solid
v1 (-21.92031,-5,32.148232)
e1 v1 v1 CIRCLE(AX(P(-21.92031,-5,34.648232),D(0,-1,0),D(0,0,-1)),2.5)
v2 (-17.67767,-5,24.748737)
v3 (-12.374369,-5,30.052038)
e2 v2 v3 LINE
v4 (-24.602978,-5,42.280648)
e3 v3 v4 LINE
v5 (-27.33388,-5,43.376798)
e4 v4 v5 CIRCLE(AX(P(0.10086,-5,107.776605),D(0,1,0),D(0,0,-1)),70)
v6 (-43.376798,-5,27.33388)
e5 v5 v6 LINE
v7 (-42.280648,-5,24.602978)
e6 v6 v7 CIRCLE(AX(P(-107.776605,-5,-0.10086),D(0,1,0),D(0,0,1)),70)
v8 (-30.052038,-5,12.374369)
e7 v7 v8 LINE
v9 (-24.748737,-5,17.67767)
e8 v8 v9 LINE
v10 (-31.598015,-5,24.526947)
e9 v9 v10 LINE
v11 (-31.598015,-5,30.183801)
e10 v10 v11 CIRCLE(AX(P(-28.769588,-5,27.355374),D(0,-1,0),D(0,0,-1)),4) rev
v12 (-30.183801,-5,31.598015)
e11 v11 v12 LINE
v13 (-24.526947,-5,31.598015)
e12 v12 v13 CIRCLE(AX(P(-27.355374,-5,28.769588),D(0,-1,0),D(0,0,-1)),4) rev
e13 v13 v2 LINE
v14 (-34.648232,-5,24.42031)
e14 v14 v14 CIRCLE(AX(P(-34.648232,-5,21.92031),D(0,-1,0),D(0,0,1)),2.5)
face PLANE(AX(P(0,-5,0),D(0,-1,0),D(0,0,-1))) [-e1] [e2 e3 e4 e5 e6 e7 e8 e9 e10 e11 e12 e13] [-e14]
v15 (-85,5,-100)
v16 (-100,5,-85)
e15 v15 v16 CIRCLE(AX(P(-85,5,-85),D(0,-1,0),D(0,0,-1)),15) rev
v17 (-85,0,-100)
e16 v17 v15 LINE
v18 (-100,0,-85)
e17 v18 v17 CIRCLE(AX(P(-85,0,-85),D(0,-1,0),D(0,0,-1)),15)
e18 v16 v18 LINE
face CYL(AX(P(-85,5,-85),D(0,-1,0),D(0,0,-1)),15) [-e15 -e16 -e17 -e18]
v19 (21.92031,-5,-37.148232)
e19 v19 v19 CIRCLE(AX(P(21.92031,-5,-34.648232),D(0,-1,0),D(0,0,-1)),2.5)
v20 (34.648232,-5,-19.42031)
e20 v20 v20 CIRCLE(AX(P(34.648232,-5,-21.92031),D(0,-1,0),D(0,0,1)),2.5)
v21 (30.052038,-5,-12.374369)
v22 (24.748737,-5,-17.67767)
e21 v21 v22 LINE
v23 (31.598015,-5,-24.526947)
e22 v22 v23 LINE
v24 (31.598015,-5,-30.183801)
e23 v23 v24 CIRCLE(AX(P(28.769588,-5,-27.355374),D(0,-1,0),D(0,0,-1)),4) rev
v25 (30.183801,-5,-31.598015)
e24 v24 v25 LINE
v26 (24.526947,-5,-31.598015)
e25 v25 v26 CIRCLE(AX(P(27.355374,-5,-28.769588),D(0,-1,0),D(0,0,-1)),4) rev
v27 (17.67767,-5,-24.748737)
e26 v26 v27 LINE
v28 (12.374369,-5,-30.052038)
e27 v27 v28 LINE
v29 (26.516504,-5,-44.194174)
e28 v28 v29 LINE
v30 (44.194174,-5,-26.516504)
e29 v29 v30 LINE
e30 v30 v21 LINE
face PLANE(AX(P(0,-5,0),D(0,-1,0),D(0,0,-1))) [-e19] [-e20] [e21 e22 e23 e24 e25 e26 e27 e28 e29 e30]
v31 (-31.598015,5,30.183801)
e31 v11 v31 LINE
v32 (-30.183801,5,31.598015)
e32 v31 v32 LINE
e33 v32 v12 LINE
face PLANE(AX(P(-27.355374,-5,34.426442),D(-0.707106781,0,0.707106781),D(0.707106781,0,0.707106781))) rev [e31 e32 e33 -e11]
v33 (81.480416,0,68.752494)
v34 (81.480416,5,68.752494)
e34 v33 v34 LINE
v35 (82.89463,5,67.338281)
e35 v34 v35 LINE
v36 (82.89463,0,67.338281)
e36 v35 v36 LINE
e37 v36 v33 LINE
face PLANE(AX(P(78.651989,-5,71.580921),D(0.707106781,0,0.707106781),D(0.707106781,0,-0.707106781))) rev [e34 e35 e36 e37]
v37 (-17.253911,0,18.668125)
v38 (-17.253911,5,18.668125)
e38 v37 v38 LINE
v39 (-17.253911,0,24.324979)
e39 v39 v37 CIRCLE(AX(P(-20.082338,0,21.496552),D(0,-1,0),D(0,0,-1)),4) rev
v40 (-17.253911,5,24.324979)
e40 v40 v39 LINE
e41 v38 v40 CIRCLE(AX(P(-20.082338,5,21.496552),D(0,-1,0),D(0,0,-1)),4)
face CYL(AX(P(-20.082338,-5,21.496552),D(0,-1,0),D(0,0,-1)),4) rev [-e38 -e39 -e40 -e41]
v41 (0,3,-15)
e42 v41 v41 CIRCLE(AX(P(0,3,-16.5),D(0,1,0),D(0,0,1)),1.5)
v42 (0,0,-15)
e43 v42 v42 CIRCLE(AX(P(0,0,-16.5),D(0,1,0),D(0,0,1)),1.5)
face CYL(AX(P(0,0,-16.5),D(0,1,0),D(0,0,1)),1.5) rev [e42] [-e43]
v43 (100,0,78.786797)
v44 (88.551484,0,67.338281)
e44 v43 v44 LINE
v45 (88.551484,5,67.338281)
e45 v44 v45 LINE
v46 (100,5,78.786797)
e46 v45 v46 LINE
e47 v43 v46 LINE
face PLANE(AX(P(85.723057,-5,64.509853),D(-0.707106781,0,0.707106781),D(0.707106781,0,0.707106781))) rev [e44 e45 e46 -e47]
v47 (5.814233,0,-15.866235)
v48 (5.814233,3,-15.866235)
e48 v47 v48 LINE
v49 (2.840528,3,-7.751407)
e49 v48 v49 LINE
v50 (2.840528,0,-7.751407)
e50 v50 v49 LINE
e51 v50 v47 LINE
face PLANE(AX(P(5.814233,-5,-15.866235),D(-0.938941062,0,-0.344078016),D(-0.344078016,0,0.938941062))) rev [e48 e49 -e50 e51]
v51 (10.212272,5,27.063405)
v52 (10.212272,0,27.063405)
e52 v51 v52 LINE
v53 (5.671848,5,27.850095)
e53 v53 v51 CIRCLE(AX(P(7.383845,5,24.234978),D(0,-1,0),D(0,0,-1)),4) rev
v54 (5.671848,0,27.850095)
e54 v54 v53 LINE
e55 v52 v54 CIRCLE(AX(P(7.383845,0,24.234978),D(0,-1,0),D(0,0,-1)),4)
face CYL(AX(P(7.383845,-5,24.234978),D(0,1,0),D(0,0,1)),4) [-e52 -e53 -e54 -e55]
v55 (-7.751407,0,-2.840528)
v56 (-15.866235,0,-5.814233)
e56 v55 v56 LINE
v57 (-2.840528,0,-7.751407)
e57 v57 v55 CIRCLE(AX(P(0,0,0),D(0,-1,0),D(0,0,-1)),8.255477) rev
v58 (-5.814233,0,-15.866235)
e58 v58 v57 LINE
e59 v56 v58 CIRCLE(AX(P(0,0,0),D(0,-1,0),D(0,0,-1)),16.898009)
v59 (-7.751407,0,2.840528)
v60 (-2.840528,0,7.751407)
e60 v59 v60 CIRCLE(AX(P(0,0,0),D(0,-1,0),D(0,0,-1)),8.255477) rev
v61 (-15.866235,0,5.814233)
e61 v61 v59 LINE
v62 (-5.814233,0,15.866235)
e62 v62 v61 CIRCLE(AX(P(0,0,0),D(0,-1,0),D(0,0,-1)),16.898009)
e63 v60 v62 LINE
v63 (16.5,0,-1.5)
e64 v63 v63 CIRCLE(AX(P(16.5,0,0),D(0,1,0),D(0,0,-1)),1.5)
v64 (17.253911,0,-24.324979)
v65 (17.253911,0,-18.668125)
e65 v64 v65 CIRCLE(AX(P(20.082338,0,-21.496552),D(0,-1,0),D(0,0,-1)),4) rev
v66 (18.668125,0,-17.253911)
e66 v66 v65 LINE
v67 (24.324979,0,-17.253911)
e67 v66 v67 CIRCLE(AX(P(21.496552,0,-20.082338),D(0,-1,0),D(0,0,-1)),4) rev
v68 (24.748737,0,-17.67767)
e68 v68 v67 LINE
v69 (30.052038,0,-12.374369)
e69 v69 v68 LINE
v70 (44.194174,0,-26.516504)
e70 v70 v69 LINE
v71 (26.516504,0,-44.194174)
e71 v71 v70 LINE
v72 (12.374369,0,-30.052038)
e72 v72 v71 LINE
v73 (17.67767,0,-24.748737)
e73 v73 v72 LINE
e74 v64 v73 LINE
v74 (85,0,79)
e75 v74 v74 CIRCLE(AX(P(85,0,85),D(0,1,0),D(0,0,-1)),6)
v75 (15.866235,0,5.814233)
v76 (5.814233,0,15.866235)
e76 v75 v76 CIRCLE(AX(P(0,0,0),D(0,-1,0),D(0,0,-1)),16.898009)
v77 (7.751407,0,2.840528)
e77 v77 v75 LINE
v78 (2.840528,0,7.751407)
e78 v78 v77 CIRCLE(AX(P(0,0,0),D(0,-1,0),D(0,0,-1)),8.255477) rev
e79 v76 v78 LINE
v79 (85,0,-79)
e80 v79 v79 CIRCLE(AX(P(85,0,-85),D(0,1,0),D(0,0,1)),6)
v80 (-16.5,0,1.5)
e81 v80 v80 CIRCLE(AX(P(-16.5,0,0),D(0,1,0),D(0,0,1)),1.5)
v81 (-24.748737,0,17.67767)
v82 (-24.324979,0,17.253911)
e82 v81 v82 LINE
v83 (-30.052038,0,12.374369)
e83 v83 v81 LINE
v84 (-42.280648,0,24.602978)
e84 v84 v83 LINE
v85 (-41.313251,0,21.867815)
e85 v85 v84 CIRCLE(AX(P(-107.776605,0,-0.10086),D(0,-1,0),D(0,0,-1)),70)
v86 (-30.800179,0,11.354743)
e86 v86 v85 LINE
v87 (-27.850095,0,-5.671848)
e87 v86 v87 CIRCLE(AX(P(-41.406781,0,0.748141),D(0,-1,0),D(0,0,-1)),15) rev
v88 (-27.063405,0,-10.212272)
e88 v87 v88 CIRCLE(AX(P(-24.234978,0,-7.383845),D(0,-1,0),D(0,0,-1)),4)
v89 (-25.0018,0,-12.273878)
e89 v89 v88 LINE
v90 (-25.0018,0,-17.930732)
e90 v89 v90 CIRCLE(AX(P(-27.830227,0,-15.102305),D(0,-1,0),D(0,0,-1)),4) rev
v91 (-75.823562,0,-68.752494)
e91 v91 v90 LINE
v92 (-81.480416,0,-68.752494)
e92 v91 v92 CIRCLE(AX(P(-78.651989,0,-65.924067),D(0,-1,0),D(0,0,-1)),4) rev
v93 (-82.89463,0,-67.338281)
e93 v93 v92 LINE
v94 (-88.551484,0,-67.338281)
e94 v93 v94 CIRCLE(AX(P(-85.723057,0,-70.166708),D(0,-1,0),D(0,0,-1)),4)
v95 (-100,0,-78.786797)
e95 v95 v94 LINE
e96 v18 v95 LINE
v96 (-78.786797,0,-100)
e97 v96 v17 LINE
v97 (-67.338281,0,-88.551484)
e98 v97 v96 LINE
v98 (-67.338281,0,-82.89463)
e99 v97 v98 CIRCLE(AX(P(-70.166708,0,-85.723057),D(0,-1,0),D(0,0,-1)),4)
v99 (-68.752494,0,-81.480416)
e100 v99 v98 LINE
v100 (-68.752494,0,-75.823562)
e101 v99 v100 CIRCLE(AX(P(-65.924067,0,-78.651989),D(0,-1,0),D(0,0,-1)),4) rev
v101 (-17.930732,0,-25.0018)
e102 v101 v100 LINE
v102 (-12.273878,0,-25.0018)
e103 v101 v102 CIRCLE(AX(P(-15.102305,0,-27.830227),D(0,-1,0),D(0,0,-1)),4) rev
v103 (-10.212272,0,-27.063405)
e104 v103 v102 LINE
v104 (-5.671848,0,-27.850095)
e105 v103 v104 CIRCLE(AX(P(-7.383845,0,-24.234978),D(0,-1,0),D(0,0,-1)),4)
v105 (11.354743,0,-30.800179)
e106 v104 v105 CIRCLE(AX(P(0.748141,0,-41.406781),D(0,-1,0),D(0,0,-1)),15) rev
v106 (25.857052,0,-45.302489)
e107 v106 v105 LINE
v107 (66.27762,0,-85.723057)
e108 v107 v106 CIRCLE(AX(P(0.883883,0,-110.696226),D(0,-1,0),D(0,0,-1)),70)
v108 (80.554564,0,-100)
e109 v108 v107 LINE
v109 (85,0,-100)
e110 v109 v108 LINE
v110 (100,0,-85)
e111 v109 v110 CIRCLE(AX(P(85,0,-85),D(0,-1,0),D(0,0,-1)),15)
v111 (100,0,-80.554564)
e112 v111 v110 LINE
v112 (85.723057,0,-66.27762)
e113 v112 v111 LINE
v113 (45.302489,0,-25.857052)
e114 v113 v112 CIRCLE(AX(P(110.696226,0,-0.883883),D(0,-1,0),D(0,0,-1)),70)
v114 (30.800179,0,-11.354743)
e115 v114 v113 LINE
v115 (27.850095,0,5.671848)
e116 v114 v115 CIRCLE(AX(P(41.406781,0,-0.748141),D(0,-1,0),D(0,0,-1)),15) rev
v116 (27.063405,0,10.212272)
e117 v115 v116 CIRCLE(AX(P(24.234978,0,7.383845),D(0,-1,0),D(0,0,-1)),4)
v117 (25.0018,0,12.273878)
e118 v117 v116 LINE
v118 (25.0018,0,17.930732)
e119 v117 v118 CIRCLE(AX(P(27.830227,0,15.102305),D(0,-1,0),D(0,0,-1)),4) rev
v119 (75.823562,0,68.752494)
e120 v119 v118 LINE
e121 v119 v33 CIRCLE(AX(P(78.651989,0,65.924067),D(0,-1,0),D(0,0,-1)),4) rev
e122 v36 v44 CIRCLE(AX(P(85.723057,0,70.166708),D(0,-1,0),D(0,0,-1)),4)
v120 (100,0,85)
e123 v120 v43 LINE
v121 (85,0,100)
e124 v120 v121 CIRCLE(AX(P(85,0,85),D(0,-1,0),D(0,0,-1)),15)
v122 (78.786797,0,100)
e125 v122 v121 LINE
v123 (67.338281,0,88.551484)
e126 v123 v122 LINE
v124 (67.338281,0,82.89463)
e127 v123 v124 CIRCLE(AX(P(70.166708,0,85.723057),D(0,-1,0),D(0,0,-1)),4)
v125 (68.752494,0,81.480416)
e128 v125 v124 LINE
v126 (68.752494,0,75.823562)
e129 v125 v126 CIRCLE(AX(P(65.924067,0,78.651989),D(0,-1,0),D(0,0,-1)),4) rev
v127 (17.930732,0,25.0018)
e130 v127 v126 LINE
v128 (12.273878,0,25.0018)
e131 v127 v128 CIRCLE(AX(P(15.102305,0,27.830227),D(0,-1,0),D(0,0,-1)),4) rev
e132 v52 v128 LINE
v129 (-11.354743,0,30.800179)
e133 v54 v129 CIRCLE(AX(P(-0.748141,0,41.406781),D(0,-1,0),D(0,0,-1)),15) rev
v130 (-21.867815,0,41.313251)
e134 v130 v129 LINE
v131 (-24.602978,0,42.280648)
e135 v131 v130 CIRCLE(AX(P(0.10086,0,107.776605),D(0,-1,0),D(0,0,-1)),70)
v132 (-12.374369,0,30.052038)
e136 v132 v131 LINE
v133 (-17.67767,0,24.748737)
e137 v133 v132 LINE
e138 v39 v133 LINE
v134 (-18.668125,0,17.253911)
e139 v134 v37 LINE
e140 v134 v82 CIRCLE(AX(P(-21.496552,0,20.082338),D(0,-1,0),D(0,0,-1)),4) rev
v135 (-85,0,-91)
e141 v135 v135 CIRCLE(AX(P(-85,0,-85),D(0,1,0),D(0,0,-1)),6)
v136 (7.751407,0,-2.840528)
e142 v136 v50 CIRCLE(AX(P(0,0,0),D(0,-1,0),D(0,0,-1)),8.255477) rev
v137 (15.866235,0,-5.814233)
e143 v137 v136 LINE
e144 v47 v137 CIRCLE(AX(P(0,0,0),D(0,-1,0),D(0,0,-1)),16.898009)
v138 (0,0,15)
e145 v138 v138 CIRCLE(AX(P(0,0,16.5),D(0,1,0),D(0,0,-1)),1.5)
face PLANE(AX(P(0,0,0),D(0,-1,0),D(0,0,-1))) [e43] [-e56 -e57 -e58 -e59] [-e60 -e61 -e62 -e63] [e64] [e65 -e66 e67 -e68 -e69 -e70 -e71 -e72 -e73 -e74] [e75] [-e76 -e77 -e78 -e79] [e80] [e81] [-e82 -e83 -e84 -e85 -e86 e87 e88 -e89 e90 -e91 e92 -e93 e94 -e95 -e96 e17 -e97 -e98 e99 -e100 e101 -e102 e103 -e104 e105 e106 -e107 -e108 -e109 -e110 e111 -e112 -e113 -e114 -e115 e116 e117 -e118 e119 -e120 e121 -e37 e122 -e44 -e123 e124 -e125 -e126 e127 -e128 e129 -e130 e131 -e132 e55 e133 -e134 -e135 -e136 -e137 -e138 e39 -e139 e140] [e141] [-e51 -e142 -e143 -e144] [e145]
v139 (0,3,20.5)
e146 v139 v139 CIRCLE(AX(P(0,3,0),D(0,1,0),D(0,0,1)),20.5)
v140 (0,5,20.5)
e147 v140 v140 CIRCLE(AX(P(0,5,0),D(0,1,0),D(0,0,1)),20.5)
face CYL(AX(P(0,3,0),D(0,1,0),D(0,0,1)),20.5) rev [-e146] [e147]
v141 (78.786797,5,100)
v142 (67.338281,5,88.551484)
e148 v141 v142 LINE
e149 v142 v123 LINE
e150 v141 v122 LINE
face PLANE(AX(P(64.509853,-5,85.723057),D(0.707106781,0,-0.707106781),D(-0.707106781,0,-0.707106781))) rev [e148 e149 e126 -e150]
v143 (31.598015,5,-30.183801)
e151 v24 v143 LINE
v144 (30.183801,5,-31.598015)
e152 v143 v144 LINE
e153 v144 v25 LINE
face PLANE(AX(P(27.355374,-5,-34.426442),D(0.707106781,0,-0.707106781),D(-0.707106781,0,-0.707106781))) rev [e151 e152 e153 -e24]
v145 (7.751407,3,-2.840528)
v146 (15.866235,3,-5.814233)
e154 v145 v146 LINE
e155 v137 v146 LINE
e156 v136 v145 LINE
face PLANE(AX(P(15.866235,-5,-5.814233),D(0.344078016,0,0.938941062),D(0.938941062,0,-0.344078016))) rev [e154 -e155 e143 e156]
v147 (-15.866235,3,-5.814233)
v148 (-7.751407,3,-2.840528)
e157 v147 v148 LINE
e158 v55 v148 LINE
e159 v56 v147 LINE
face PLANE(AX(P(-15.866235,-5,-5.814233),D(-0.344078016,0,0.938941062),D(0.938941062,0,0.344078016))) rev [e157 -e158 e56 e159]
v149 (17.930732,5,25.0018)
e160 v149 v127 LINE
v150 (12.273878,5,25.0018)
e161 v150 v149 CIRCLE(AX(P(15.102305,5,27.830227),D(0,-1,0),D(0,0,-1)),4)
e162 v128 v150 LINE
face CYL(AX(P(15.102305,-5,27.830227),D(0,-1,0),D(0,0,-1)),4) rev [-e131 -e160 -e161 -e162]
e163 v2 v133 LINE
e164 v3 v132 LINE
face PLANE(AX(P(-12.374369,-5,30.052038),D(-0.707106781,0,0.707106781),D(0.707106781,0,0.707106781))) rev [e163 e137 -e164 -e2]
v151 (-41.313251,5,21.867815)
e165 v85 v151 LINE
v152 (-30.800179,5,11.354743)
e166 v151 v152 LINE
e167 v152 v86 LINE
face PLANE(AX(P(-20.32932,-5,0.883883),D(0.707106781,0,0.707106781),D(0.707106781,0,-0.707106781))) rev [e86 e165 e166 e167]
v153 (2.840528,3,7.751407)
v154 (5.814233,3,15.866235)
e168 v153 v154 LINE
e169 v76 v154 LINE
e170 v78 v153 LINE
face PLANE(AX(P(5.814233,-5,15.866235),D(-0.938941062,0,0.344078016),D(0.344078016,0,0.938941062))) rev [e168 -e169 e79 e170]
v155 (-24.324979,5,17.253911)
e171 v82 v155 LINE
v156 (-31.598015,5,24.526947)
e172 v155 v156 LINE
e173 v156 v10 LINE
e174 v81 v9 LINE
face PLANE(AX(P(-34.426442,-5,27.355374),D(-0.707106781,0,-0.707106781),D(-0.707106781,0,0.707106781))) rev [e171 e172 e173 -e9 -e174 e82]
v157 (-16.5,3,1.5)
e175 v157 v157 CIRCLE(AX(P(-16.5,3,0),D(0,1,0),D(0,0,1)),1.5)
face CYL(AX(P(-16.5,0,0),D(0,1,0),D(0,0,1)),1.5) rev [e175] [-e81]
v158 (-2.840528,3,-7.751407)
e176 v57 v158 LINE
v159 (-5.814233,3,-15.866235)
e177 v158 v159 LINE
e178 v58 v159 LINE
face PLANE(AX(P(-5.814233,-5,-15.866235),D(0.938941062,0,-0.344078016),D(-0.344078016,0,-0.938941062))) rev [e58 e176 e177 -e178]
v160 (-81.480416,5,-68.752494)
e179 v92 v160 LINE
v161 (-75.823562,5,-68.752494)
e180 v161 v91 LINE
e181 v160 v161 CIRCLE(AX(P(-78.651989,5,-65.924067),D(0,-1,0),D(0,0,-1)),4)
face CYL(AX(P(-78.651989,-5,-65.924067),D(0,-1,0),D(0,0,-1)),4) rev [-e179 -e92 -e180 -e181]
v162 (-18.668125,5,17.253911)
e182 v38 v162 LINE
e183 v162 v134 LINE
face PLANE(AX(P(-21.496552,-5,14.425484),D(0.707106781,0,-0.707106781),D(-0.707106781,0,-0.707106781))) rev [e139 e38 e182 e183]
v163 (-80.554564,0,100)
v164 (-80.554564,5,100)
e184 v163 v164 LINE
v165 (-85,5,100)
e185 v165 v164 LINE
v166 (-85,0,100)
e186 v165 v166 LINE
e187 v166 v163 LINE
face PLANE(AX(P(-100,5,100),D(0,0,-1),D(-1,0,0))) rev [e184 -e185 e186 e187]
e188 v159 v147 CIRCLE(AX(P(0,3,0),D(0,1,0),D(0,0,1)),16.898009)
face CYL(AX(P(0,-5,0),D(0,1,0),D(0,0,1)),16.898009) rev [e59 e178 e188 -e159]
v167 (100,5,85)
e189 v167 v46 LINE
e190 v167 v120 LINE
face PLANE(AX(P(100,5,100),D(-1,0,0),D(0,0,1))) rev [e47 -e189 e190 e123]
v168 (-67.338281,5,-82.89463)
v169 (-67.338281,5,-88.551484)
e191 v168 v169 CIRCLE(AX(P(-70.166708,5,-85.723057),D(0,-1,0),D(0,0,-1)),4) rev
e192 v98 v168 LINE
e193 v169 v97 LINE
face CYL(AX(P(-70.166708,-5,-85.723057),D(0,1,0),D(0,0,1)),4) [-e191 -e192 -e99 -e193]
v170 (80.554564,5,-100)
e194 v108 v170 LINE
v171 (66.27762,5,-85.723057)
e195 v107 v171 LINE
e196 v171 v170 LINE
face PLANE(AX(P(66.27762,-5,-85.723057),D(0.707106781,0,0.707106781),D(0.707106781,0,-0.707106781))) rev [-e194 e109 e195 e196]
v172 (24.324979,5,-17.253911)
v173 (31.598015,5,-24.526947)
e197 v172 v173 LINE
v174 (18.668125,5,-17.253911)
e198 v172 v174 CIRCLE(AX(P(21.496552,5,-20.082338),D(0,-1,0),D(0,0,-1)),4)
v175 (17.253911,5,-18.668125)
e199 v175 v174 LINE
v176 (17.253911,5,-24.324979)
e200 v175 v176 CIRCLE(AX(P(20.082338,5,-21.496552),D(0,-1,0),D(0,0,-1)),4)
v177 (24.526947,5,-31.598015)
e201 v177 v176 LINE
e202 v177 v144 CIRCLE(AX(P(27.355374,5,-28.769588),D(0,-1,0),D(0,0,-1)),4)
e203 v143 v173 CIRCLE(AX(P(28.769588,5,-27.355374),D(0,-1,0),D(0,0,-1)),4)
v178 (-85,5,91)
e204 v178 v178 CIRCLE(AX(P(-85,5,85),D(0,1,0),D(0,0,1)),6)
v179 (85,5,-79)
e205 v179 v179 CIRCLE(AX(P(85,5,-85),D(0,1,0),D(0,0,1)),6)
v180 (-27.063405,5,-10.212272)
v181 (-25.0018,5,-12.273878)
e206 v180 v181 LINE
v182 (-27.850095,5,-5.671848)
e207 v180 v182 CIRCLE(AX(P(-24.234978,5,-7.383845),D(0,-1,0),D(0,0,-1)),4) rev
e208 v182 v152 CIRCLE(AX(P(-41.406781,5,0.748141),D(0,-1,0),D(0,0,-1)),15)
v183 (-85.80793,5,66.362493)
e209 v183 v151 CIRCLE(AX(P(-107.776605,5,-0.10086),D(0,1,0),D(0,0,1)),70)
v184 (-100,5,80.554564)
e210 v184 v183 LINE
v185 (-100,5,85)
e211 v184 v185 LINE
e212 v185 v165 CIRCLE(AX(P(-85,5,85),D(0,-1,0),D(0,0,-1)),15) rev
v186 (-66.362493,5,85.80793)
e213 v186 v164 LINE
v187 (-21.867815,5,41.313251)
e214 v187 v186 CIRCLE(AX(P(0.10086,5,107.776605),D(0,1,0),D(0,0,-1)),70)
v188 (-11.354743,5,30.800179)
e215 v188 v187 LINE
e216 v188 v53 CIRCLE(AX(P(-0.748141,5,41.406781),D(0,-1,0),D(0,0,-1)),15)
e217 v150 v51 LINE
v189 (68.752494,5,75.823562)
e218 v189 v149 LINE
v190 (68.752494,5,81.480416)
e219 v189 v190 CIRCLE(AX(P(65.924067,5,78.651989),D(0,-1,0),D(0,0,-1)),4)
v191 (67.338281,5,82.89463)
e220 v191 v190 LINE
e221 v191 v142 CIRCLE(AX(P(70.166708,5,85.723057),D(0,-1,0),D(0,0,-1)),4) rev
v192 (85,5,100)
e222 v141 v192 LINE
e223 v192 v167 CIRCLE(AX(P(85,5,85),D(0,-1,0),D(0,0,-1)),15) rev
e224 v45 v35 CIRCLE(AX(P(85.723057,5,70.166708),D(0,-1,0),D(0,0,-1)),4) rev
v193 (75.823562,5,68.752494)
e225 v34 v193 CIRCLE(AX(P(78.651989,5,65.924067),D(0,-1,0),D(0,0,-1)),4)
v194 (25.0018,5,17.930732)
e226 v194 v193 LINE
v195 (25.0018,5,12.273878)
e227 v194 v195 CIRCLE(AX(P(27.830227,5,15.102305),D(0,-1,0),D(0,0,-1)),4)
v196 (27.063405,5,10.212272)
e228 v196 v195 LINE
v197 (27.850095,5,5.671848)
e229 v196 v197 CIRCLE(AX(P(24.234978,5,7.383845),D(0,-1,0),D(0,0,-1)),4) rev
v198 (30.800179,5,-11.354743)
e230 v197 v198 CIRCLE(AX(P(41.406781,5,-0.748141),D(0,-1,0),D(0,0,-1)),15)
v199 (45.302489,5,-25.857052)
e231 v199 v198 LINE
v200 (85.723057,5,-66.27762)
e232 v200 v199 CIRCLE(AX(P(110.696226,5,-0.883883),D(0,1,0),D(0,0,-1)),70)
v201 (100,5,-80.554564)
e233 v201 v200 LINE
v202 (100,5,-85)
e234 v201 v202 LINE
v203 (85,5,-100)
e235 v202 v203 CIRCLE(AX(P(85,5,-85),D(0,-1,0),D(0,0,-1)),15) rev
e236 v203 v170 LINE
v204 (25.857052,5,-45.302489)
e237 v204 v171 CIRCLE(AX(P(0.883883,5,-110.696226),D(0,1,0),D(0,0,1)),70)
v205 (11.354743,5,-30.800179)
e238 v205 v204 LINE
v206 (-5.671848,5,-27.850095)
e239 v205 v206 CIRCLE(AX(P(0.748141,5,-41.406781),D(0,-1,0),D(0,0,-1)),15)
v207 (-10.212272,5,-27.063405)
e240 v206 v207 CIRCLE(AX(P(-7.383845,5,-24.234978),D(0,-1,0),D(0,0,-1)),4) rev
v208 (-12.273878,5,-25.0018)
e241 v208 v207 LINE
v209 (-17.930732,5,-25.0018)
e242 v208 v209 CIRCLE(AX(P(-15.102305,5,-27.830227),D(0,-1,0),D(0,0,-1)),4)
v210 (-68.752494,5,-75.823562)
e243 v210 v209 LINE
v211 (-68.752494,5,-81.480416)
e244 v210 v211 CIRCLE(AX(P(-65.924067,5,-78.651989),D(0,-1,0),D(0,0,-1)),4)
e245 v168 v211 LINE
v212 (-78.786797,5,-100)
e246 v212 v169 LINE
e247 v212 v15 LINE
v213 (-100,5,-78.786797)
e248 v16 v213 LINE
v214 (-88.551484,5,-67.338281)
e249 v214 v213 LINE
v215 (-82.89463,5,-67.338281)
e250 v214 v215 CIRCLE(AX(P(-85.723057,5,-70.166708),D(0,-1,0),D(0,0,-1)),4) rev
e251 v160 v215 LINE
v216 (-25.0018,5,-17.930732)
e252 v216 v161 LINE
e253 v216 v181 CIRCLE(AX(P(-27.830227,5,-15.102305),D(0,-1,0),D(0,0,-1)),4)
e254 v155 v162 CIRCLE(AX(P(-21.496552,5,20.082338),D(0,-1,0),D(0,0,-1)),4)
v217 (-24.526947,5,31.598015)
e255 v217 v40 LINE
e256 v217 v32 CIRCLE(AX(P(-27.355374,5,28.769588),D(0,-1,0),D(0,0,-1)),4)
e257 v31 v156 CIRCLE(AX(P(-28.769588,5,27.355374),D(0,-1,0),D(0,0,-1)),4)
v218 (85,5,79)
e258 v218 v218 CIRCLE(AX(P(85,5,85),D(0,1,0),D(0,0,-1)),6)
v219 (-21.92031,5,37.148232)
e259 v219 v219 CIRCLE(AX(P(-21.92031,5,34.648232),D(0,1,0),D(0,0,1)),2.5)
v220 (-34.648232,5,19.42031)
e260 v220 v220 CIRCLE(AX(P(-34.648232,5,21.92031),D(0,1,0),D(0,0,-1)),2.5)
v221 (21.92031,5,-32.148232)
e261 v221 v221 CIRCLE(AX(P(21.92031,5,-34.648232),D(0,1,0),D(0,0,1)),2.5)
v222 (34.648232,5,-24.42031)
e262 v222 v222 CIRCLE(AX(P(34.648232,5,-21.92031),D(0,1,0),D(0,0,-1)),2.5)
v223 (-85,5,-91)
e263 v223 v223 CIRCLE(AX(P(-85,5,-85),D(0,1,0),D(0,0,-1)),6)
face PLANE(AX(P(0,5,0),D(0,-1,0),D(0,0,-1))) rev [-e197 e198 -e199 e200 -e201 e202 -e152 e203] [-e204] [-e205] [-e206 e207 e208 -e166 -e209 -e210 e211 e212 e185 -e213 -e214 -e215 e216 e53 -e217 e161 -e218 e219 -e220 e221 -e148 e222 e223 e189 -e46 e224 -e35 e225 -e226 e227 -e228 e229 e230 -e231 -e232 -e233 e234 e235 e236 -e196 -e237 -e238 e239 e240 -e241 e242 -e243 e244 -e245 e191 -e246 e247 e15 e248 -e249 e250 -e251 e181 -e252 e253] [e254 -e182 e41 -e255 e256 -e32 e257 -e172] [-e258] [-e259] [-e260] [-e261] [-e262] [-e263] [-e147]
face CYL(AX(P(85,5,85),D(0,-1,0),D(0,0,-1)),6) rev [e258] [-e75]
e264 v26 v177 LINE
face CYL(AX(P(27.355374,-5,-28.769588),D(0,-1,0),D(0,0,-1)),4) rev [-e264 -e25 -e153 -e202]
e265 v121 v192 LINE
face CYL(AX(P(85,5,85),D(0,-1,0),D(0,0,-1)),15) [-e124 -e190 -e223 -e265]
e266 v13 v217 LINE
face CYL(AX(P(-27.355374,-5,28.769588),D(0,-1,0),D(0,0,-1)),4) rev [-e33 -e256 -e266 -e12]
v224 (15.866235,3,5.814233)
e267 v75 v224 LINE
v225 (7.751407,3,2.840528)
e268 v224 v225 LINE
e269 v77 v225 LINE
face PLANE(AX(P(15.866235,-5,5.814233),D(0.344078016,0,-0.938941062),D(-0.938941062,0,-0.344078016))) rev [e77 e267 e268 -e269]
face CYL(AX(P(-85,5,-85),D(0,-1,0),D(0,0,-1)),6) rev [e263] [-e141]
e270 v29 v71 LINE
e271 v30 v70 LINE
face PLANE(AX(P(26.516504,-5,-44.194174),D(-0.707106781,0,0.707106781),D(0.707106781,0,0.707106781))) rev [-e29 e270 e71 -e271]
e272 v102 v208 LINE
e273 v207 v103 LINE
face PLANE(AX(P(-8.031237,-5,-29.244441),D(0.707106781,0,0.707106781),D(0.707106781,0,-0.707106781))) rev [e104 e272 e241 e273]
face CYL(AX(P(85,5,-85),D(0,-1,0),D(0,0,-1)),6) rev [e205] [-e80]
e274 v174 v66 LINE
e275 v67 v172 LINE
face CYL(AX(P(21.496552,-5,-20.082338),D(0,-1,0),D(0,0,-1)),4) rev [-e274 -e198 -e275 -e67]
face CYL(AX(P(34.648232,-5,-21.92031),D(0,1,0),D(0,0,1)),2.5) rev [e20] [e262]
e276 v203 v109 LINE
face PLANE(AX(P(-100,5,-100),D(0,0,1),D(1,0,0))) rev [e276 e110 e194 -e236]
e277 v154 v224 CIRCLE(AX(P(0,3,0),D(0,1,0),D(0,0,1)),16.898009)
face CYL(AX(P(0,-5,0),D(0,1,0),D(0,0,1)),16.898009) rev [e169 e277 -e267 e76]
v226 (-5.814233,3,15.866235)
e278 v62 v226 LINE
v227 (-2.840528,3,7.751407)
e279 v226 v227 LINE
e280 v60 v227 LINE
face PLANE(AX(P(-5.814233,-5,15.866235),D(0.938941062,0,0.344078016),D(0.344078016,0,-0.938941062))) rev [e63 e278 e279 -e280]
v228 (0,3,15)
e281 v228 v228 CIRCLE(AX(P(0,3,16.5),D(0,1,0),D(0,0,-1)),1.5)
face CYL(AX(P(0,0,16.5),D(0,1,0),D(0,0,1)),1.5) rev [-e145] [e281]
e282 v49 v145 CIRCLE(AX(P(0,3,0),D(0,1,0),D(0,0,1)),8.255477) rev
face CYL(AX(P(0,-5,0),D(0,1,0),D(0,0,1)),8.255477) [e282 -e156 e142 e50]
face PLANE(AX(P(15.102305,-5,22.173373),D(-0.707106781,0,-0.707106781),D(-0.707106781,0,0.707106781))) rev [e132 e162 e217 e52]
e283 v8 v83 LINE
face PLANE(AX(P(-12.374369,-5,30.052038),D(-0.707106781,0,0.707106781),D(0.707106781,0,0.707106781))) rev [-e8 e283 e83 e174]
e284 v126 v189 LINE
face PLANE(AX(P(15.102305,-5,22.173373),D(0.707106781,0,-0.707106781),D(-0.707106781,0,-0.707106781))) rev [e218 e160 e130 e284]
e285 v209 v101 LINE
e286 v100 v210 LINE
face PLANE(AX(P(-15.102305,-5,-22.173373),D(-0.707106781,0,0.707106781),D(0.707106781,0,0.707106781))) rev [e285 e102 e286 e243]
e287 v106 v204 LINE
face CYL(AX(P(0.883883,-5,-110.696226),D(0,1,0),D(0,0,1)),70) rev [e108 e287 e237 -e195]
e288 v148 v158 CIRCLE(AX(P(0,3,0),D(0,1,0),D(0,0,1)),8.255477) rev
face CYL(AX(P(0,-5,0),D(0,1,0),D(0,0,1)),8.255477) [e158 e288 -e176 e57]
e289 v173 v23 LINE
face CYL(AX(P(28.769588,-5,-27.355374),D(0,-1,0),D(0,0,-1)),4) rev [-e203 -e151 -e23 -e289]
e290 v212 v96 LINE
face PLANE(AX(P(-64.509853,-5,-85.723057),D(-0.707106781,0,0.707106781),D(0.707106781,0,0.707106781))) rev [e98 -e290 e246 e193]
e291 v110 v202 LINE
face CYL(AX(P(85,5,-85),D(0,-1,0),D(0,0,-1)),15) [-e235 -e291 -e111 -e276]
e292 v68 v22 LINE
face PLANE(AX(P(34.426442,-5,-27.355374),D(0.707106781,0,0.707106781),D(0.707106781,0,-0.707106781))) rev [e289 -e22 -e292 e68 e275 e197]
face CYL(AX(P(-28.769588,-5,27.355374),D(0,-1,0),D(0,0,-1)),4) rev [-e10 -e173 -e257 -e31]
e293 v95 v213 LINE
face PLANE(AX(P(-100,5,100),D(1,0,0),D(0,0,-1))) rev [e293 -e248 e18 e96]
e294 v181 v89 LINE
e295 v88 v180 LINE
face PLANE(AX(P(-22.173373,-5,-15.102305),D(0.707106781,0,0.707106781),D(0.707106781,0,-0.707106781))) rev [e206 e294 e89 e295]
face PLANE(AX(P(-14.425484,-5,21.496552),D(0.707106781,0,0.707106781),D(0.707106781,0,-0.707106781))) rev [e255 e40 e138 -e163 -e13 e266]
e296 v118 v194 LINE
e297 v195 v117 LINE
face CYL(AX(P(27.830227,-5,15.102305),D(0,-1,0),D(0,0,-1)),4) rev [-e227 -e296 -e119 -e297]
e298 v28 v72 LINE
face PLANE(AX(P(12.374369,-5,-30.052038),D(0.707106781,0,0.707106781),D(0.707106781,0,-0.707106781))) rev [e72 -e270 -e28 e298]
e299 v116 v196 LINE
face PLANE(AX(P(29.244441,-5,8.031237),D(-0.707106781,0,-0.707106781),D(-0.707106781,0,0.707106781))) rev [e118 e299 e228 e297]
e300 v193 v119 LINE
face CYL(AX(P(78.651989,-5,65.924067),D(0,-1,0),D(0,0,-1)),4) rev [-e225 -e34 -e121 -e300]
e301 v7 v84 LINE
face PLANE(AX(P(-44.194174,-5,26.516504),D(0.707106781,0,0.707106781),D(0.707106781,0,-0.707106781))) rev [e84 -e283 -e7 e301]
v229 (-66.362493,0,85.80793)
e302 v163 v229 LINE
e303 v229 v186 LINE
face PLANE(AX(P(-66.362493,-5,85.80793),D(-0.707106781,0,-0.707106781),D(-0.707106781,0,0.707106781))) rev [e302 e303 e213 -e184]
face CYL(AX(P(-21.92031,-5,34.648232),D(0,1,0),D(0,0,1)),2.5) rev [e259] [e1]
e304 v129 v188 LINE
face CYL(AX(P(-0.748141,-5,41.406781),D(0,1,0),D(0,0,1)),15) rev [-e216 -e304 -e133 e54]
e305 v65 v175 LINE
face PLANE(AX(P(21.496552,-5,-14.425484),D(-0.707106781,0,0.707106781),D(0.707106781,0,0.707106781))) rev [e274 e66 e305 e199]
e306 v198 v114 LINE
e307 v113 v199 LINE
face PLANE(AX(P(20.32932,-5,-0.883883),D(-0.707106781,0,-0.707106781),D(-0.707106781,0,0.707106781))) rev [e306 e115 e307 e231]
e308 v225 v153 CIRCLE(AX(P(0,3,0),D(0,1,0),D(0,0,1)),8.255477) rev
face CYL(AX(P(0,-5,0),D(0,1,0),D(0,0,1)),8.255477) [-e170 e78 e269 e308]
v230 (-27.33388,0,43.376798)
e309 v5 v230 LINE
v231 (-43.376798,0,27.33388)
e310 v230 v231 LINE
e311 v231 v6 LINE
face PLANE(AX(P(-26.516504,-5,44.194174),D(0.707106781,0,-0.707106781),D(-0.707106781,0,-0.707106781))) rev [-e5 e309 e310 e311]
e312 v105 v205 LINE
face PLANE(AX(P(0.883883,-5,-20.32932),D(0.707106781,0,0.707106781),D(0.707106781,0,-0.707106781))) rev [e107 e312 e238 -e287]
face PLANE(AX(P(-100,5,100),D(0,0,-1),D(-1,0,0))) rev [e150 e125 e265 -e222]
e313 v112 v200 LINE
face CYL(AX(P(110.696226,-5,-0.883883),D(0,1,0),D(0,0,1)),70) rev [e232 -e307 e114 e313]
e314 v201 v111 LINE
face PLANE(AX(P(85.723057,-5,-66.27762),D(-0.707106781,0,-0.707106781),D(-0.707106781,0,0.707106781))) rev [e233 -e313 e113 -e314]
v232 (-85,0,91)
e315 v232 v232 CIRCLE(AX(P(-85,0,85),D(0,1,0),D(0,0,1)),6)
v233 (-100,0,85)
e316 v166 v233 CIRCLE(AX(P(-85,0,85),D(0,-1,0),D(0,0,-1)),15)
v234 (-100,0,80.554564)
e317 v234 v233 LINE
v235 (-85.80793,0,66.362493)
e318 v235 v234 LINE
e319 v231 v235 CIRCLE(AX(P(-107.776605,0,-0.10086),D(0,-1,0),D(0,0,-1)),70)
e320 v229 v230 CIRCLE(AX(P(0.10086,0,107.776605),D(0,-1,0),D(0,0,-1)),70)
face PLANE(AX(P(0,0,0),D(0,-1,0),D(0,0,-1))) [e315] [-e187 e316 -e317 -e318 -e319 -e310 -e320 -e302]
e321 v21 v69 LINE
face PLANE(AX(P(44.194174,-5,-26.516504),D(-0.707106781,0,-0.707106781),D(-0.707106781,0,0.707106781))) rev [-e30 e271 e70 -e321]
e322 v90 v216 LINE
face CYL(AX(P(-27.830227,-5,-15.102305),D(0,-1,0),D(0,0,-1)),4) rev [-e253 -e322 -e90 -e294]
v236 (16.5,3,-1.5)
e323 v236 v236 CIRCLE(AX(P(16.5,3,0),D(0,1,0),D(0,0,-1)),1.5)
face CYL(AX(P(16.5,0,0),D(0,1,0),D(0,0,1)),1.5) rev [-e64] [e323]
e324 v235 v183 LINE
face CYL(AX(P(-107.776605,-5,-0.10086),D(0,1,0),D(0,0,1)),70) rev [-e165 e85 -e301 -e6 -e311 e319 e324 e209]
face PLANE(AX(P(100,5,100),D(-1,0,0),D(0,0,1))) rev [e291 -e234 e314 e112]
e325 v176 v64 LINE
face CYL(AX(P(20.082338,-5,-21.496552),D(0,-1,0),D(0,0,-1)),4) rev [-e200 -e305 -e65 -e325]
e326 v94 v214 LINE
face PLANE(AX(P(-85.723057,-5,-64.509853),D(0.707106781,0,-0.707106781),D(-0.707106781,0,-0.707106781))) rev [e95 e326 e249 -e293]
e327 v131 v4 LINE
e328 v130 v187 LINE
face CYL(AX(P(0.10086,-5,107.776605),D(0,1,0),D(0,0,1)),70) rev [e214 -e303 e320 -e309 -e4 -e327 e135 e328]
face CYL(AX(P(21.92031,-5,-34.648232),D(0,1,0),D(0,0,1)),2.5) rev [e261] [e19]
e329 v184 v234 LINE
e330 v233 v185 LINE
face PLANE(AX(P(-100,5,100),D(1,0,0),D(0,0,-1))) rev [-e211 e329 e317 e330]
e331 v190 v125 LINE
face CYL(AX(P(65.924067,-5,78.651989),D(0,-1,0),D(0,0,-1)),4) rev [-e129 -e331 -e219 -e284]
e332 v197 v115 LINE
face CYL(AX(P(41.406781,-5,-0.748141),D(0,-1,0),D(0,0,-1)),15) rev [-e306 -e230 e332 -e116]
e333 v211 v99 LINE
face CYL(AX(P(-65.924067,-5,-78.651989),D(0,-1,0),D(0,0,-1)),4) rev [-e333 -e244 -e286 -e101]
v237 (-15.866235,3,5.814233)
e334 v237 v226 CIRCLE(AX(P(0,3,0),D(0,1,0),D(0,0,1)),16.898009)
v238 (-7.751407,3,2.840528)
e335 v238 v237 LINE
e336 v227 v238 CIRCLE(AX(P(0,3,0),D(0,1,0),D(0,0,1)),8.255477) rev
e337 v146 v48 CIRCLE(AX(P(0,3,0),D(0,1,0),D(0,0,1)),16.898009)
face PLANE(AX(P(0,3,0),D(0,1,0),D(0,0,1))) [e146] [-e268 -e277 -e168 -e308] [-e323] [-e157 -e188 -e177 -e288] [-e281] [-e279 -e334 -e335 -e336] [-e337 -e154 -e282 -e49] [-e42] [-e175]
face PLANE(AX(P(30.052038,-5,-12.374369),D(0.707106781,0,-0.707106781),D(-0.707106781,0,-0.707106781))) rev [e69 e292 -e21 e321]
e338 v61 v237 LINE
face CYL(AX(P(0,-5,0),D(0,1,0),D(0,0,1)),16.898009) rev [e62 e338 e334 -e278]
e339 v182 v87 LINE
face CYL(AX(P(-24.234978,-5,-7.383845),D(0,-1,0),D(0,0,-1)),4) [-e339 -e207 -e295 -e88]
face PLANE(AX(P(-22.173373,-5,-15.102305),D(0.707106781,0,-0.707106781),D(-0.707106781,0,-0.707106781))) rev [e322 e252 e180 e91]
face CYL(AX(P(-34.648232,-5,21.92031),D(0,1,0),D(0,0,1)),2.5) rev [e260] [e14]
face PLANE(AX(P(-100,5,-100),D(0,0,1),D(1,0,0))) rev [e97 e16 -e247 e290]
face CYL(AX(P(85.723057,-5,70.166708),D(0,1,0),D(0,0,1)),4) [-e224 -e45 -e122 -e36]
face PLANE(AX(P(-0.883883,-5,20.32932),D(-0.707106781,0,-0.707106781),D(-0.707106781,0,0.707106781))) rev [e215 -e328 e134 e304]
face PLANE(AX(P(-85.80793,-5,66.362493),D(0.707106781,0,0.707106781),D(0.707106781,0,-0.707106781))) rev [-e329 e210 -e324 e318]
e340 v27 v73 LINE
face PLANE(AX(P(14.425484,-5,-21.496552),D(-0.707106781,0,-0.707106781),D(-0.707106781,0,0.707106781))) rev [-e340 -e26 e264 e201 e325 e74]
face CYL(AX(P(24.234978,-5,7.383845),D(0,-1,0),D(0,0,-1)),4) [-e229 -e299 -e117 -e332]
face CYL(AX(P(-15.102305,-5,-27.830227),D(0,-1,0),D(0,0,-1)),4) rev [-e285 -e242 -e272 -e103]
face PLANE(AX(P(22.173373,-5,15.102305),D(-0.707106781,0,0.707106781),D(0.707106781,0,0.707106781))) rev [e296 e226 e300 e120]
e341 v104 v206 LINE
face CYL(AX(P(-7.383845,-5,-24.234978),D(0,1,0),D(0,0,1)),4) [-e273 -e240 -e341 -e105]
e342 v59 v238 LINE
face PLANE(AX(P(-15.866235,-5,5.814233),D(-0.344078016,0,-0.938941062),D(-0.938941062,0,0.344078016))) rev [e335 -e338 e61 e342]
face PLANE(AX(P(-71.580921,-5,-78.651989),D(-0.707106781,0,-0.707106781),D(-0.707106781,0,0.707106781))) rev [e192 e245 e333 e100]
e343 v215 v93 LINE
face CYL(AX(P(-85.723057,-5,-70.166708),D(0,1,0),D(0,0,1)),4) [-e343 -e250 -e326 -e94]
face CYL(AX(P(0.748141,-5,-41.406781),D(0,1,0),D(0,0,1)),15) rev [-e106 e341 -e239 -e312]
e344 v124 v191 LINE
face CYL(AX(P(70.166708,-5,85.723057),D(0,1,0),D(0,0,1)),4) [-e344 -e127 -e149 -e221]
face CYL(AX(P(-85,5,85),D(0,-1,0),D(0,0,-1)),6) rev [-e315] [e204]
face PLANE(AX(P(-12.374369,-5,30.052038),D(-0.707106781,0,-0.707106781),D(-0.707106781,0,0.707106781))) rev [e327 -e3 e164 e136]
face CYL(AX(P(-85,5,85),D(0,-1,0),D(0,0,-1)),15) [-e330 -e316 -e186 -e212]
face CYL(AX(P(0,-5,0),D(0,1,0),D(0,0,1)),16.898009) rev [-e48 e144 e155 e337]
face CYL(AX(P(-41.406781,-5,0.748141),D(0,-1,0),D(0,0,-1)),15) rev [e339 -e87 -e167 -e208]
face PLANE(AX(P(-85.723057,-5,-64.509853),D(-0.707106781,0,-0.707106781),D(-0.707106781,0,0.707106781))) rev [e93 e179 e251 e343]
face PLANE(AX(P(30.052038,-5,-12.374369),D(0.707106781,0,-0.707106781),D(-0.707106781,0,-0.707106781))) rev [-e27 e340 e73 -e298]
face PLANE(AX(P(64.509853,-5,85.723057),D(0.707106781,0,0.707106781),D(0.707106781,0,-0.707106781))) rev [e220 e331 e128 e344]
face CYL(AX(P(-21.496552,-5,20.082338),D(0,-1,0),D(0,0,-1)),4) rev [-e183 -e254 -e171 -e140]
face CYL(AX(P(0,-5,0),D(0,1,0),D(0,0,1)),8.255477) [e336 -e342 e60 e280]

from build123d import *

# Parameters (mm, degrees)
SKETCH_1_W          = 200
SKETCH_1_H          = 200
SKETCH_1_R          = 6
EXTRUDE_1_DEPTH     = 5
SKETCH_3_R          = 20.5
CUT_EXTRUDE_1_DEPTH = 2
SKETCH_4_R          = 1.5
CUT_EXTRUDE_2_DEPTH = 142.453172464
SKETCH_6_R          = 2.5
EXTRUDE_2_DEPTH     = 5
CUT_EXTRUDE_3_DEPTH = 142.774468788
FILLET_1_R          = 15
SKETCH_7_R          = 2.5
CUT_EXTRUDE_4_DEPTH = 142.774468788
FILLET_2_R          = 4


with BuildPart() as part:
    # 草圖1 → 填料-伸長1 (new body)
    with BuildSketch(Plane(origin=(0, 0, 0), x_dir=(1, 0, 0), z_dir=(0, 1, 0))):
        Rectangle(SKETCH_1_W, SKETCH_1_H)
        with Locations(Location((85, 85, 0), (0, 0, 270))):
            Circle(SKETCH_1_R, mode=Mode.SUBTRACT)
        with Locations(Location((-85, 85, 0), (0, 0, 90))):
            Circle(SKETCH_1_R, mode=Mode.SUBTRACT)
        with Locations(Location((85, -85, 0), (0, 0, 90))):
            Circle(SKETCH_1_R, mode=Mode.SUBTRACT)
        with Locations(Location((-85, -85, 0), (0, 0, 270))):
            Circle(SKETCH_1_R, mode=Mode.SUBTRACT)
    extrude(amount=EXTRUDE_1_DEPTH)

    # 草圖3 → 除料-伸長1 (cut)
    with BuildSketch(Plane(origin=(0, 5, 0), x_dir=(1, 0, 0), z_dir=(0, 1, 0))):
        with Locations(Location((0, 0, 0), (0, 0, 270))):
            Circle(SKETCH_3_R)
    extrude(amount=-CUT_EXTRUDE_1_DEPTH, mode=Mode.SUBTRACT)

    # 草圖4 → 除料-伸長2 (cut, through all)
    with BuildSketch(Plane(origin=(0, 3, 0), x_dir=(1, 0, 0), z_dir=(0, 1, 0))):
        with Locations(Location((-16.5, 0, 0), (0, 0, 270))):
            Circle(SKETCH_4_R)
        with Locations(Location((16.5, 0, 0), (0, 0, 90))):
            Circle(SKETCH_4_R)
        with Locations(Location((0, 16.5, 0), (0, 0, 270))):
            Circle(SKETCH_4_R)
        with Locations(Location((0, -16.5, 0), (0, 0, 90))):
            Circle(SKETCH_4_R)
    extrude(amount=-CUT_EXTRUDE_2_DEPTH, mode=Mode.SUBTRACT)

    # 草圖6 → 填料-伸長2 (add)
    # profile 1 of 2: a face of its own
    with BuildSketch(Plane.XZ):
        Polygon((-44.194173824, 26.516504294), (-30.0520382, 12.374368671), (-12.374368671, 30.0520382), (-26.516504294, 44.194173824), align=None)
        with Locations(Location((-21.920310217, 34.648232278, 0), (0, 0, 270))):
            Circle(SKETCH_6_R, mode=Mode.SUBTRACT)
        with Locations(Location((-34.648232278, 21.920310217, 0), (0, 0, 90))):
            Circle(SKETCH_6_R, mode=Mode.SUBTRACT)
    # profile 2 of 2: a face of its own
    with BuildSketch(Plane.XZ):
        Polygon((26.516504294, -44.194173824), (44.194173824, -26.516504294), (30.0520382, -12.374368671), (12.374368671, -30.0520382), align=None)
        with Locations(Location((34.648232278, -21.920310217, 0), (0, 0, 90))):
            Circle(SKETCH_6_R, mode=Mode.SUBTRACT)
        with Locations(Location((21.920310217, -34.648232278, 0), (0, 0, 270))):
            Circle(SKETCH_6_R, mode=Mode.SUBTRACT)
    extrude(amount=EXTRUDE_2_DEPTH)

    # 草圖5 → 除料-伸長3 (cut, through all)
    with BuildSketch(Plane(origin=(0, 5, 0), x_dir=(1, 0, 0), z_dir=(0, 1, 0))):
        with BuildLine():
            Line((15.10230502, -22.173372832), (71.580921309, -78.651989121))
            Line((71.580921309, -78.651989121), (64.509853497, -85.723056933))
            Line((64.509853497, -85.723056933), (78.786796564, -100))
            Line((78.786796564, -100), (-80.554563517, -100))
            Line((-80.554563517, -100), (-66.36249332, -85.807929803))
            ThreePointArc((-66.36249332, -85.807929803), (-49.396614756, -58.27912998), (-21.867814933, -41.313251416))
            Line((-21.867814933, -41.313251416), (-0.883883476, -20.329319959))
            Line((-0.883883476, -20.329319959), (8.031237208, -29.244440644))
            Line((8.031237208, -29.244440644), (15.10230502, -22.173372832))
        make_face()
        with BuildLine():
            Line((-20.329319959, -0.883883476), (-29.244440644, 8.031237208))
            Line((-29.244440644, 8.031237208), (-22.173372832, 15.10230502))
            Line((-22.173372832, 15.10230502), (-78.651989121, 71.580921309))
            Line((-78.651989121, 71.580921309), (-85.723056933, 64.509853497))
            Line((-85.723056933, 64.509853497), (-100, 78.786796564))
            Line((-100, 78.786796564), (-100, -80.554563517))
            Line((-100, -80.554563517), (-85.807929803, -66.36249332))
            ThreePointArc((-85.807929803, -66.36249332), (-58.27912998, -49.396614756), (-41.313251416, -21.867814933))
            Line((-41.313251416, -21.867814933), (-20.329319959, -0.883883476))
        make_face()
        with BuildLine():
            Line((-78.786796564, 100), (80.554563517, 100))
            Line((80.554563517, 100), (66.27762045, 85.723056933))
            ThreePointArc((66.27762045, 85.723056933), (50.38135816, 61.198751144), (25.857052371, 45.302488854))
            Line((25.857052371, 45.302488854), (0.883883476, 20.329319959))
            Line((0.883883476, 20.329319959), (-8.031237208, 29.244440644))
            Line((-8.031237208, 29.244440644), (-15.10230502, 22.173372832))
            Line((-15.10230502, 22.173372832), (-71.580921309, 78.651989121))
            Line((-71.580921309, 78.651989121), (-64.509853497, 85.723056933))
            Line((-64.509853497, 85.723056933), (-78.786796564, 100))
        make_face()
        Polygon((14.425484168, 21.49655198), (27.355374186, 34.426441998), (34.426441998, 27.355374186), (21.49655198, 14.425484168), align=None)
        Polygon((-14.425484168, -21.49655198), (-27.355374186, -34.426441998), (-34.426441998, -27.355374186), (-21.49655198, -14.425484168), align=None)
        with BuildLine():
            Line((-15.866234687, 5.81423348), (-7.751406526, 2.840528218))
            ThreePointArc((-7.751406526, 2.840528218), (-5.837503906, 5.837503906), (-2.840528218, 7.751406526))
            Line((-2.840528218, 7.751406526), (-5.81423348, 15.866234687))
            ThreePointArc((-5.81423348, 15.866234687), (-11.948696877, 11.948696877), (-15.866234687, 5.81423348))
        make_face()
        with BuildLine():
            Line((15.866234687, 5.81423348), (7.751406526, 2.840528218))
            ThreePointArc((7.751406526, 2.840528218), (5.837503906, 5.837503906), (2.840528218, 7.751406526))
            Line((2.840528218, 7.751406526), (5.81423348, 15.866234687))
            ThreePointArc((5.81423348, 15.866234687), (11.948696877, 11.948696877), (15.866234687, 5.81423348))
        make_face()
        with BuildLine():
            Line((5.81423348, -15.866234687), (2.840528218, -7.751406526))
            ThreePointArc((2.840528218, -7.751406526), (5.837503906, -5.837503906), (7.751406526, -2.840528218))
            Line((7.751406526, -2.840528218), (15.866234687, -5.81423348))
            ThreePointArc((15.866234687, -5.81423348), (11.948696877, -11.948696877), (5.81423348, -15.866234687))
        make_face()
        with BuildLine():
            Line((-15.866234687, -5.81423348), (-7.751406526, -2.840528218))
            ThreePointArc((-7.751406526, -2.840528218), (-5.837503906, -5.837503906), (-2.840528218, -7.751406526))
            Line((-2.840528218, -7.751406526), (-5.81423348, -15.866234687))
            ThreePointArc((-5.81423348, -15.866234687), (-11.948696877, -11.948696877), (-15.866234687, -5.81423348))
        make_face()
        with BuildLine():
            Line((20.329319959, 0.883883476), (45.302488854, 25.857052371))
            ThreePointArc((45.302488854, 25.857052371), (61.198751144, 50.38135816), (85.723056933, 66.27762045))
            Line((85.723056933, 66.27762045), (100, 80.554563517))
            Line((100, 80.554563517), (100, -78.786796564))
            Line((100, -78.786796564), (85.723056933, -64.509853497))
            Line((85.723056933, -64.509853497), (78.651989121, -71.580921309))
            Line((78.651989121, -71.580921309), (22.173372832, -15.10230502))
            Line((22.173372832, -15.10230502), (29.244440644, -8.031237208))
            Line((29.244440644, -8.031237208), (20.329319959, 0.883883476))
        make_face()
    extrude(amount=-CUT_EXTRUDE_3_DEPTH, mode=Mode.SUBTRACT)

    # 圓角1
    # the kernel refuses this fillet: 15 mm, written as the material it adds along each edge
    with BuildSketch(Plane(origin=(-20.329319959, 40.020077646, 0.883883476), x_dir=(-0.7071067811865923, 0, -0.7071067811865027), z_dir=(0, -1, 0))) as fillet_1_piece_1_section:
        with BuildLine():
            CenterArc((15, -14.808031059), FILLET_1_R, 99.17638759, 80.82361241)
            Line((0, -14.808031059), (0, 0))
            Line((0, 0), (12.607884583, 0))
        make_face()
    fillet_1_piece_1 = extrude(amount=40.020077646, mode=Mode.PRIVATE)
    fillet_1_piece_1 = split(fillet_1_piece_1, bisect_by=Plane(origin=(-20.329319959, 5, 0.883883476), z_dir=(0, -1, 0)), keep=Keep.TOP, mode=Mode.PRIVATE)
    fillet_1_piece_1 = fillet_1_piece_1 - Plane(origin=(0, 40.020077646, 0), x_dir=(0, 0, 1), z_dir=(0, 1, 0)) * Cylinder(20.5, 140, mode=Mode.PRIVATE)
    add(fillet_1_piece_1)
    with BuildSketch(Plane(origin=(-20.329319959, 3, 0.883883476), x_dir=(-0.7071067811865923, 0, -0.7071067811865027), z_dir=(0, -1, 0)), Plane(origin=(20.329319959, 3, -0.883883476), x_dir=(0.7071067811865909, 0, 0.7071067811865042), z_dir=(0, -1, 0))) as fillet_1_piece_2:
        with BuildLine():
            CenterArc((15, -14.808031059), FILLET_1_R, 99.17638759, 80.82361241)
            Line((0, -14.808031059), (0, 0))
            Line((0, 0), (12.607884583, 0))
        make_face()
    extrude(amount=3)
    with BuildSketch(Plane(origin=(0.883883476, 40.020077646, -20.329319959), x_dir=(0.7071067811865474, 0, -0.7071067811865478), z_dir=(0, -1, 0))) as fillet_1_piece_3_section:
        with BuildLine():
            CenterArc((14.808031059, -15), FILLET_1_R, 90, 80.82361241)
            Line((0, -12.607884583), (0, 0))
            Line((0, 0), (14.808031059, 0))
        make_face()
    fillet_1_piece_3 = extrude(amount=40.020077646, mode=Mode.PRIVATE)
    fillet_1_piece_3 = split(fillet_1_piece_3, bisect_by=Plane(origin=(0.883883476, 5, -20.329319959), z_dir=(0, -1, 0)), keep=Keep.TOP, mode=Mode.PRIVATE)
    fillet_1_piece_3 = fillet_1_piece_3 - Plane(origin=(0, 40.020077646, 0), x_dir=(0, 0, 1), z_dir=(0, 1, 0)) * Cylinder(20.5, 140, mode=Mode.PRIVATE)
    add(fillet_1_piece_3)
    with BuildSketch(Plane(origin=(0.883883476, 3, -20.329319959), x_dir=(0.7071067811865474, 0, -0.7071067811865478), z_dir=(0, -1, 0)), Plane(origin=(-0.883883476, 3, 20.329319959), x_dir=(-0.7071067811865483, 0, 0.7071067811865467), z_dir=(0, -1, 0))) as fillet_1_piece_4:
        with BuildLine():
            CenterArc((14.808031059, -15), FILLET_1_R, 90, 80.82361241)
            Line((0, -12.607884583), (0, 0))
            Line((0, 0), (14.808031059, 0))
        make_face()
    extrude(amount=3)
    with BuildSketch(Plane(origin=(20.329319959, 40.020077646, -0.883883476), x_dir=(0.7071067811865909, 0, 0.7071067811865042), z_dir=(0, -1, 0))) as fillet_1_piece_5_section:
        with BuildLine():
            CenterArc((15, -14.808031059), FILLET_1_R, 99.17638759, 80.82361241)
            Line((0, -14.808031059), (0, 0))
            Line((0, 0), (12.607884583, 0))
        make_face()
    fillet_1_piece_5 = extrude(amount=40.020077646, mode=Mode.PRIVATE)
    fillet_1_piece_5 = split(fillet_1_piece_5, bisect_by=Plane(origin=(20.329319959, 5, -0.883883476), z_dir=(0, -1, 0)), keep=Keep.TOP, mode=Mode.PRIVATE)
    fillet_1_piece_5 = fillet_1_piece_5 - Plane(origin=(0, 40.020077646, 0), x_dir=(0, 0, 1), z_dir=(0, 1, 0)) * Cylinder(20.5, 140, mode=Mode.PRIVATE)
    add(fillet_1_piece_5)
    with BuildSketch(Plane(origin=(-0.883883476, 40.020077646, 20.329319959), x_dir=(-0.7071067811865483, 0, 0.7071067811865467), z_dir=(0, -1, 0))) as fillet_1_piece_6_section:
        with BuildLine():
            CenterArc((14.808031059, -15), FILLET_1_R, 90, 80.82361241)
            Line((0, -12.607884583), (0, 0))
            Line((0, 0), (14.808031059, 0))
        make_face()
    fillet_1_piece_6 = extrude(amount=40.020077646, mode=Mode.PRIVATE)
    fillet_1_piece_6 = split(fillet_1_piece_6, bisect_by=Plane(origin=(-0.883883476, 5, 20.329319959), z_dir=(0, -1, 0)), keep=Keep.TOP, mode=Mode.PRIVATE)
    fillet_1_piece_6 = fillet_1_piece_6 - Plane(origin=(0, 40.020077646, 0), x_dir=(0, 0, 1), z_dir=(0, 1, 0)) * Cylinder(20.5, 140, mode=Mode.PRIVATE)
    add(fillet_1_piece_6)
    # the kernel refuses this fillet: 15 mm, written as the material it takes off along each edge
    with BuildSketch(Plane(origin=(-100, -37.5, 100), x_dir=(1, 0, 0), z_dir=(0, 1, 0))) as fillet_1_2_piece_1:
        with BuildLine():
            CenterArc((FILLET_1_R, FILLET_1_R), FILLET_1_R, 180, 90)
            Line((0, FILLET_1_R), (0, 0))
            Line((0, 0), (FILLET_1_R, 0))
        make_face()
    extrude(amount=80, mode=Mode.SUBTRACT)
    with BuildSketch(Plane(origin=(-100, -37.5, -100), x_dir=(1, 0, 0), z_dir=(0, 1, 0)), Plane(origin=(100, -37.5, -100), x_dir=(0, 0, 1), z_dir=(0, 1, 0)), Plane(origin=(100, -37.5, 100), x_dir=(-1, 0, 0), z_dir=(0, 1, 0))) as fillet_1_2_piece_2:
        with BuildLine():
            CenterArc((FILLET_1_R, -FILLET_1_R), FILLET_1_R, 90, 90)
            Line((0, -FILLET_1_R), (0, 0))
            Line((0, 0), (FILLET_1_R, 0))
        make_face()
    extrude(amount=80, mode=Mode.SUBTRACT)

    # 草圖7 → 除料-伸長4 (cut, through all)
    with BuildSketch(Plane(origin=(0, 5, 0), x_dir=(1, 0, 0), z_dir=(0, 1, 0))):
        with Locations(Location((21.920310217, 34.648232278, 0), (0, 0, 270))):
            Circle(SKETCH_7_R)
        with Locations(Location((34.648232278, 21.920310217, 0), (0, 0, 270))):
            Circle(SKETCH_7_R)
        with Locations(Location((-21.920310217, -34.648232278, 0), (0, 0, 270))):
            Circle(SKETCH_7_R)
        with Locations(Location((-34.648232278, -21.920310217, 0), (0, 0, 270))):
            Circle(SKETCH_7_R)
    extrude(amount=-CUT_EXTRUDE_4_DEPTH, mode=Mode.SUBTRACT)

    # 圓角2
    fillet_2_edges = [part.edges().sort_by_distance(p)[0] for p in [
        (27.355374186, 0, -34.426441998),
        (34.426441998, 0, -27.355374186),
        (21.49655198, 2.5, -14.425484168),
        (14.425484168, 2.5, -21.49655198),
        (-27.355374186, 0, 34.426441998),
        (-34.426441998, 0, 27.355374186),
        (-21.49655198, 2.5, 14.425484168),
        (-14.425484168, 2.5, 21.49655198),
        (-8.031237208, 2.5, -29.244440644),
        (-15.10230502, 2.5, -22.173372832),
        (-71.580921309, 2.5, -78.651989121),
        (-64.509853497, 2.5, -85.723056933),
        (-29.244440644, 2.5, -8.031237208),
        (-85.723056933, 2.5, -64.509853497),
        (-78.651989121, 2.5, -71.580921309),
        (-22.173372832, 2.5, -15.10230502),
        (29.244440644, 2.5, 8.031237208),
        (85.723056933, 2.5, 64.509853497),
        (78.651989121, 2.5, 71.580921309),
        (22.173372832, 2.5, 15.10230502),
        (8.031237208, 2.5, 29.244440644),
        (15.10230502, 2.5, 22.173372832),
        (71.580921309, 2.5, 78.651989121),
        (64.509853497, 2.5, 85.723056933),
    ]]
    fillet(fillet_2_edges, radius=FILLET_2_R)


solid = part.part
